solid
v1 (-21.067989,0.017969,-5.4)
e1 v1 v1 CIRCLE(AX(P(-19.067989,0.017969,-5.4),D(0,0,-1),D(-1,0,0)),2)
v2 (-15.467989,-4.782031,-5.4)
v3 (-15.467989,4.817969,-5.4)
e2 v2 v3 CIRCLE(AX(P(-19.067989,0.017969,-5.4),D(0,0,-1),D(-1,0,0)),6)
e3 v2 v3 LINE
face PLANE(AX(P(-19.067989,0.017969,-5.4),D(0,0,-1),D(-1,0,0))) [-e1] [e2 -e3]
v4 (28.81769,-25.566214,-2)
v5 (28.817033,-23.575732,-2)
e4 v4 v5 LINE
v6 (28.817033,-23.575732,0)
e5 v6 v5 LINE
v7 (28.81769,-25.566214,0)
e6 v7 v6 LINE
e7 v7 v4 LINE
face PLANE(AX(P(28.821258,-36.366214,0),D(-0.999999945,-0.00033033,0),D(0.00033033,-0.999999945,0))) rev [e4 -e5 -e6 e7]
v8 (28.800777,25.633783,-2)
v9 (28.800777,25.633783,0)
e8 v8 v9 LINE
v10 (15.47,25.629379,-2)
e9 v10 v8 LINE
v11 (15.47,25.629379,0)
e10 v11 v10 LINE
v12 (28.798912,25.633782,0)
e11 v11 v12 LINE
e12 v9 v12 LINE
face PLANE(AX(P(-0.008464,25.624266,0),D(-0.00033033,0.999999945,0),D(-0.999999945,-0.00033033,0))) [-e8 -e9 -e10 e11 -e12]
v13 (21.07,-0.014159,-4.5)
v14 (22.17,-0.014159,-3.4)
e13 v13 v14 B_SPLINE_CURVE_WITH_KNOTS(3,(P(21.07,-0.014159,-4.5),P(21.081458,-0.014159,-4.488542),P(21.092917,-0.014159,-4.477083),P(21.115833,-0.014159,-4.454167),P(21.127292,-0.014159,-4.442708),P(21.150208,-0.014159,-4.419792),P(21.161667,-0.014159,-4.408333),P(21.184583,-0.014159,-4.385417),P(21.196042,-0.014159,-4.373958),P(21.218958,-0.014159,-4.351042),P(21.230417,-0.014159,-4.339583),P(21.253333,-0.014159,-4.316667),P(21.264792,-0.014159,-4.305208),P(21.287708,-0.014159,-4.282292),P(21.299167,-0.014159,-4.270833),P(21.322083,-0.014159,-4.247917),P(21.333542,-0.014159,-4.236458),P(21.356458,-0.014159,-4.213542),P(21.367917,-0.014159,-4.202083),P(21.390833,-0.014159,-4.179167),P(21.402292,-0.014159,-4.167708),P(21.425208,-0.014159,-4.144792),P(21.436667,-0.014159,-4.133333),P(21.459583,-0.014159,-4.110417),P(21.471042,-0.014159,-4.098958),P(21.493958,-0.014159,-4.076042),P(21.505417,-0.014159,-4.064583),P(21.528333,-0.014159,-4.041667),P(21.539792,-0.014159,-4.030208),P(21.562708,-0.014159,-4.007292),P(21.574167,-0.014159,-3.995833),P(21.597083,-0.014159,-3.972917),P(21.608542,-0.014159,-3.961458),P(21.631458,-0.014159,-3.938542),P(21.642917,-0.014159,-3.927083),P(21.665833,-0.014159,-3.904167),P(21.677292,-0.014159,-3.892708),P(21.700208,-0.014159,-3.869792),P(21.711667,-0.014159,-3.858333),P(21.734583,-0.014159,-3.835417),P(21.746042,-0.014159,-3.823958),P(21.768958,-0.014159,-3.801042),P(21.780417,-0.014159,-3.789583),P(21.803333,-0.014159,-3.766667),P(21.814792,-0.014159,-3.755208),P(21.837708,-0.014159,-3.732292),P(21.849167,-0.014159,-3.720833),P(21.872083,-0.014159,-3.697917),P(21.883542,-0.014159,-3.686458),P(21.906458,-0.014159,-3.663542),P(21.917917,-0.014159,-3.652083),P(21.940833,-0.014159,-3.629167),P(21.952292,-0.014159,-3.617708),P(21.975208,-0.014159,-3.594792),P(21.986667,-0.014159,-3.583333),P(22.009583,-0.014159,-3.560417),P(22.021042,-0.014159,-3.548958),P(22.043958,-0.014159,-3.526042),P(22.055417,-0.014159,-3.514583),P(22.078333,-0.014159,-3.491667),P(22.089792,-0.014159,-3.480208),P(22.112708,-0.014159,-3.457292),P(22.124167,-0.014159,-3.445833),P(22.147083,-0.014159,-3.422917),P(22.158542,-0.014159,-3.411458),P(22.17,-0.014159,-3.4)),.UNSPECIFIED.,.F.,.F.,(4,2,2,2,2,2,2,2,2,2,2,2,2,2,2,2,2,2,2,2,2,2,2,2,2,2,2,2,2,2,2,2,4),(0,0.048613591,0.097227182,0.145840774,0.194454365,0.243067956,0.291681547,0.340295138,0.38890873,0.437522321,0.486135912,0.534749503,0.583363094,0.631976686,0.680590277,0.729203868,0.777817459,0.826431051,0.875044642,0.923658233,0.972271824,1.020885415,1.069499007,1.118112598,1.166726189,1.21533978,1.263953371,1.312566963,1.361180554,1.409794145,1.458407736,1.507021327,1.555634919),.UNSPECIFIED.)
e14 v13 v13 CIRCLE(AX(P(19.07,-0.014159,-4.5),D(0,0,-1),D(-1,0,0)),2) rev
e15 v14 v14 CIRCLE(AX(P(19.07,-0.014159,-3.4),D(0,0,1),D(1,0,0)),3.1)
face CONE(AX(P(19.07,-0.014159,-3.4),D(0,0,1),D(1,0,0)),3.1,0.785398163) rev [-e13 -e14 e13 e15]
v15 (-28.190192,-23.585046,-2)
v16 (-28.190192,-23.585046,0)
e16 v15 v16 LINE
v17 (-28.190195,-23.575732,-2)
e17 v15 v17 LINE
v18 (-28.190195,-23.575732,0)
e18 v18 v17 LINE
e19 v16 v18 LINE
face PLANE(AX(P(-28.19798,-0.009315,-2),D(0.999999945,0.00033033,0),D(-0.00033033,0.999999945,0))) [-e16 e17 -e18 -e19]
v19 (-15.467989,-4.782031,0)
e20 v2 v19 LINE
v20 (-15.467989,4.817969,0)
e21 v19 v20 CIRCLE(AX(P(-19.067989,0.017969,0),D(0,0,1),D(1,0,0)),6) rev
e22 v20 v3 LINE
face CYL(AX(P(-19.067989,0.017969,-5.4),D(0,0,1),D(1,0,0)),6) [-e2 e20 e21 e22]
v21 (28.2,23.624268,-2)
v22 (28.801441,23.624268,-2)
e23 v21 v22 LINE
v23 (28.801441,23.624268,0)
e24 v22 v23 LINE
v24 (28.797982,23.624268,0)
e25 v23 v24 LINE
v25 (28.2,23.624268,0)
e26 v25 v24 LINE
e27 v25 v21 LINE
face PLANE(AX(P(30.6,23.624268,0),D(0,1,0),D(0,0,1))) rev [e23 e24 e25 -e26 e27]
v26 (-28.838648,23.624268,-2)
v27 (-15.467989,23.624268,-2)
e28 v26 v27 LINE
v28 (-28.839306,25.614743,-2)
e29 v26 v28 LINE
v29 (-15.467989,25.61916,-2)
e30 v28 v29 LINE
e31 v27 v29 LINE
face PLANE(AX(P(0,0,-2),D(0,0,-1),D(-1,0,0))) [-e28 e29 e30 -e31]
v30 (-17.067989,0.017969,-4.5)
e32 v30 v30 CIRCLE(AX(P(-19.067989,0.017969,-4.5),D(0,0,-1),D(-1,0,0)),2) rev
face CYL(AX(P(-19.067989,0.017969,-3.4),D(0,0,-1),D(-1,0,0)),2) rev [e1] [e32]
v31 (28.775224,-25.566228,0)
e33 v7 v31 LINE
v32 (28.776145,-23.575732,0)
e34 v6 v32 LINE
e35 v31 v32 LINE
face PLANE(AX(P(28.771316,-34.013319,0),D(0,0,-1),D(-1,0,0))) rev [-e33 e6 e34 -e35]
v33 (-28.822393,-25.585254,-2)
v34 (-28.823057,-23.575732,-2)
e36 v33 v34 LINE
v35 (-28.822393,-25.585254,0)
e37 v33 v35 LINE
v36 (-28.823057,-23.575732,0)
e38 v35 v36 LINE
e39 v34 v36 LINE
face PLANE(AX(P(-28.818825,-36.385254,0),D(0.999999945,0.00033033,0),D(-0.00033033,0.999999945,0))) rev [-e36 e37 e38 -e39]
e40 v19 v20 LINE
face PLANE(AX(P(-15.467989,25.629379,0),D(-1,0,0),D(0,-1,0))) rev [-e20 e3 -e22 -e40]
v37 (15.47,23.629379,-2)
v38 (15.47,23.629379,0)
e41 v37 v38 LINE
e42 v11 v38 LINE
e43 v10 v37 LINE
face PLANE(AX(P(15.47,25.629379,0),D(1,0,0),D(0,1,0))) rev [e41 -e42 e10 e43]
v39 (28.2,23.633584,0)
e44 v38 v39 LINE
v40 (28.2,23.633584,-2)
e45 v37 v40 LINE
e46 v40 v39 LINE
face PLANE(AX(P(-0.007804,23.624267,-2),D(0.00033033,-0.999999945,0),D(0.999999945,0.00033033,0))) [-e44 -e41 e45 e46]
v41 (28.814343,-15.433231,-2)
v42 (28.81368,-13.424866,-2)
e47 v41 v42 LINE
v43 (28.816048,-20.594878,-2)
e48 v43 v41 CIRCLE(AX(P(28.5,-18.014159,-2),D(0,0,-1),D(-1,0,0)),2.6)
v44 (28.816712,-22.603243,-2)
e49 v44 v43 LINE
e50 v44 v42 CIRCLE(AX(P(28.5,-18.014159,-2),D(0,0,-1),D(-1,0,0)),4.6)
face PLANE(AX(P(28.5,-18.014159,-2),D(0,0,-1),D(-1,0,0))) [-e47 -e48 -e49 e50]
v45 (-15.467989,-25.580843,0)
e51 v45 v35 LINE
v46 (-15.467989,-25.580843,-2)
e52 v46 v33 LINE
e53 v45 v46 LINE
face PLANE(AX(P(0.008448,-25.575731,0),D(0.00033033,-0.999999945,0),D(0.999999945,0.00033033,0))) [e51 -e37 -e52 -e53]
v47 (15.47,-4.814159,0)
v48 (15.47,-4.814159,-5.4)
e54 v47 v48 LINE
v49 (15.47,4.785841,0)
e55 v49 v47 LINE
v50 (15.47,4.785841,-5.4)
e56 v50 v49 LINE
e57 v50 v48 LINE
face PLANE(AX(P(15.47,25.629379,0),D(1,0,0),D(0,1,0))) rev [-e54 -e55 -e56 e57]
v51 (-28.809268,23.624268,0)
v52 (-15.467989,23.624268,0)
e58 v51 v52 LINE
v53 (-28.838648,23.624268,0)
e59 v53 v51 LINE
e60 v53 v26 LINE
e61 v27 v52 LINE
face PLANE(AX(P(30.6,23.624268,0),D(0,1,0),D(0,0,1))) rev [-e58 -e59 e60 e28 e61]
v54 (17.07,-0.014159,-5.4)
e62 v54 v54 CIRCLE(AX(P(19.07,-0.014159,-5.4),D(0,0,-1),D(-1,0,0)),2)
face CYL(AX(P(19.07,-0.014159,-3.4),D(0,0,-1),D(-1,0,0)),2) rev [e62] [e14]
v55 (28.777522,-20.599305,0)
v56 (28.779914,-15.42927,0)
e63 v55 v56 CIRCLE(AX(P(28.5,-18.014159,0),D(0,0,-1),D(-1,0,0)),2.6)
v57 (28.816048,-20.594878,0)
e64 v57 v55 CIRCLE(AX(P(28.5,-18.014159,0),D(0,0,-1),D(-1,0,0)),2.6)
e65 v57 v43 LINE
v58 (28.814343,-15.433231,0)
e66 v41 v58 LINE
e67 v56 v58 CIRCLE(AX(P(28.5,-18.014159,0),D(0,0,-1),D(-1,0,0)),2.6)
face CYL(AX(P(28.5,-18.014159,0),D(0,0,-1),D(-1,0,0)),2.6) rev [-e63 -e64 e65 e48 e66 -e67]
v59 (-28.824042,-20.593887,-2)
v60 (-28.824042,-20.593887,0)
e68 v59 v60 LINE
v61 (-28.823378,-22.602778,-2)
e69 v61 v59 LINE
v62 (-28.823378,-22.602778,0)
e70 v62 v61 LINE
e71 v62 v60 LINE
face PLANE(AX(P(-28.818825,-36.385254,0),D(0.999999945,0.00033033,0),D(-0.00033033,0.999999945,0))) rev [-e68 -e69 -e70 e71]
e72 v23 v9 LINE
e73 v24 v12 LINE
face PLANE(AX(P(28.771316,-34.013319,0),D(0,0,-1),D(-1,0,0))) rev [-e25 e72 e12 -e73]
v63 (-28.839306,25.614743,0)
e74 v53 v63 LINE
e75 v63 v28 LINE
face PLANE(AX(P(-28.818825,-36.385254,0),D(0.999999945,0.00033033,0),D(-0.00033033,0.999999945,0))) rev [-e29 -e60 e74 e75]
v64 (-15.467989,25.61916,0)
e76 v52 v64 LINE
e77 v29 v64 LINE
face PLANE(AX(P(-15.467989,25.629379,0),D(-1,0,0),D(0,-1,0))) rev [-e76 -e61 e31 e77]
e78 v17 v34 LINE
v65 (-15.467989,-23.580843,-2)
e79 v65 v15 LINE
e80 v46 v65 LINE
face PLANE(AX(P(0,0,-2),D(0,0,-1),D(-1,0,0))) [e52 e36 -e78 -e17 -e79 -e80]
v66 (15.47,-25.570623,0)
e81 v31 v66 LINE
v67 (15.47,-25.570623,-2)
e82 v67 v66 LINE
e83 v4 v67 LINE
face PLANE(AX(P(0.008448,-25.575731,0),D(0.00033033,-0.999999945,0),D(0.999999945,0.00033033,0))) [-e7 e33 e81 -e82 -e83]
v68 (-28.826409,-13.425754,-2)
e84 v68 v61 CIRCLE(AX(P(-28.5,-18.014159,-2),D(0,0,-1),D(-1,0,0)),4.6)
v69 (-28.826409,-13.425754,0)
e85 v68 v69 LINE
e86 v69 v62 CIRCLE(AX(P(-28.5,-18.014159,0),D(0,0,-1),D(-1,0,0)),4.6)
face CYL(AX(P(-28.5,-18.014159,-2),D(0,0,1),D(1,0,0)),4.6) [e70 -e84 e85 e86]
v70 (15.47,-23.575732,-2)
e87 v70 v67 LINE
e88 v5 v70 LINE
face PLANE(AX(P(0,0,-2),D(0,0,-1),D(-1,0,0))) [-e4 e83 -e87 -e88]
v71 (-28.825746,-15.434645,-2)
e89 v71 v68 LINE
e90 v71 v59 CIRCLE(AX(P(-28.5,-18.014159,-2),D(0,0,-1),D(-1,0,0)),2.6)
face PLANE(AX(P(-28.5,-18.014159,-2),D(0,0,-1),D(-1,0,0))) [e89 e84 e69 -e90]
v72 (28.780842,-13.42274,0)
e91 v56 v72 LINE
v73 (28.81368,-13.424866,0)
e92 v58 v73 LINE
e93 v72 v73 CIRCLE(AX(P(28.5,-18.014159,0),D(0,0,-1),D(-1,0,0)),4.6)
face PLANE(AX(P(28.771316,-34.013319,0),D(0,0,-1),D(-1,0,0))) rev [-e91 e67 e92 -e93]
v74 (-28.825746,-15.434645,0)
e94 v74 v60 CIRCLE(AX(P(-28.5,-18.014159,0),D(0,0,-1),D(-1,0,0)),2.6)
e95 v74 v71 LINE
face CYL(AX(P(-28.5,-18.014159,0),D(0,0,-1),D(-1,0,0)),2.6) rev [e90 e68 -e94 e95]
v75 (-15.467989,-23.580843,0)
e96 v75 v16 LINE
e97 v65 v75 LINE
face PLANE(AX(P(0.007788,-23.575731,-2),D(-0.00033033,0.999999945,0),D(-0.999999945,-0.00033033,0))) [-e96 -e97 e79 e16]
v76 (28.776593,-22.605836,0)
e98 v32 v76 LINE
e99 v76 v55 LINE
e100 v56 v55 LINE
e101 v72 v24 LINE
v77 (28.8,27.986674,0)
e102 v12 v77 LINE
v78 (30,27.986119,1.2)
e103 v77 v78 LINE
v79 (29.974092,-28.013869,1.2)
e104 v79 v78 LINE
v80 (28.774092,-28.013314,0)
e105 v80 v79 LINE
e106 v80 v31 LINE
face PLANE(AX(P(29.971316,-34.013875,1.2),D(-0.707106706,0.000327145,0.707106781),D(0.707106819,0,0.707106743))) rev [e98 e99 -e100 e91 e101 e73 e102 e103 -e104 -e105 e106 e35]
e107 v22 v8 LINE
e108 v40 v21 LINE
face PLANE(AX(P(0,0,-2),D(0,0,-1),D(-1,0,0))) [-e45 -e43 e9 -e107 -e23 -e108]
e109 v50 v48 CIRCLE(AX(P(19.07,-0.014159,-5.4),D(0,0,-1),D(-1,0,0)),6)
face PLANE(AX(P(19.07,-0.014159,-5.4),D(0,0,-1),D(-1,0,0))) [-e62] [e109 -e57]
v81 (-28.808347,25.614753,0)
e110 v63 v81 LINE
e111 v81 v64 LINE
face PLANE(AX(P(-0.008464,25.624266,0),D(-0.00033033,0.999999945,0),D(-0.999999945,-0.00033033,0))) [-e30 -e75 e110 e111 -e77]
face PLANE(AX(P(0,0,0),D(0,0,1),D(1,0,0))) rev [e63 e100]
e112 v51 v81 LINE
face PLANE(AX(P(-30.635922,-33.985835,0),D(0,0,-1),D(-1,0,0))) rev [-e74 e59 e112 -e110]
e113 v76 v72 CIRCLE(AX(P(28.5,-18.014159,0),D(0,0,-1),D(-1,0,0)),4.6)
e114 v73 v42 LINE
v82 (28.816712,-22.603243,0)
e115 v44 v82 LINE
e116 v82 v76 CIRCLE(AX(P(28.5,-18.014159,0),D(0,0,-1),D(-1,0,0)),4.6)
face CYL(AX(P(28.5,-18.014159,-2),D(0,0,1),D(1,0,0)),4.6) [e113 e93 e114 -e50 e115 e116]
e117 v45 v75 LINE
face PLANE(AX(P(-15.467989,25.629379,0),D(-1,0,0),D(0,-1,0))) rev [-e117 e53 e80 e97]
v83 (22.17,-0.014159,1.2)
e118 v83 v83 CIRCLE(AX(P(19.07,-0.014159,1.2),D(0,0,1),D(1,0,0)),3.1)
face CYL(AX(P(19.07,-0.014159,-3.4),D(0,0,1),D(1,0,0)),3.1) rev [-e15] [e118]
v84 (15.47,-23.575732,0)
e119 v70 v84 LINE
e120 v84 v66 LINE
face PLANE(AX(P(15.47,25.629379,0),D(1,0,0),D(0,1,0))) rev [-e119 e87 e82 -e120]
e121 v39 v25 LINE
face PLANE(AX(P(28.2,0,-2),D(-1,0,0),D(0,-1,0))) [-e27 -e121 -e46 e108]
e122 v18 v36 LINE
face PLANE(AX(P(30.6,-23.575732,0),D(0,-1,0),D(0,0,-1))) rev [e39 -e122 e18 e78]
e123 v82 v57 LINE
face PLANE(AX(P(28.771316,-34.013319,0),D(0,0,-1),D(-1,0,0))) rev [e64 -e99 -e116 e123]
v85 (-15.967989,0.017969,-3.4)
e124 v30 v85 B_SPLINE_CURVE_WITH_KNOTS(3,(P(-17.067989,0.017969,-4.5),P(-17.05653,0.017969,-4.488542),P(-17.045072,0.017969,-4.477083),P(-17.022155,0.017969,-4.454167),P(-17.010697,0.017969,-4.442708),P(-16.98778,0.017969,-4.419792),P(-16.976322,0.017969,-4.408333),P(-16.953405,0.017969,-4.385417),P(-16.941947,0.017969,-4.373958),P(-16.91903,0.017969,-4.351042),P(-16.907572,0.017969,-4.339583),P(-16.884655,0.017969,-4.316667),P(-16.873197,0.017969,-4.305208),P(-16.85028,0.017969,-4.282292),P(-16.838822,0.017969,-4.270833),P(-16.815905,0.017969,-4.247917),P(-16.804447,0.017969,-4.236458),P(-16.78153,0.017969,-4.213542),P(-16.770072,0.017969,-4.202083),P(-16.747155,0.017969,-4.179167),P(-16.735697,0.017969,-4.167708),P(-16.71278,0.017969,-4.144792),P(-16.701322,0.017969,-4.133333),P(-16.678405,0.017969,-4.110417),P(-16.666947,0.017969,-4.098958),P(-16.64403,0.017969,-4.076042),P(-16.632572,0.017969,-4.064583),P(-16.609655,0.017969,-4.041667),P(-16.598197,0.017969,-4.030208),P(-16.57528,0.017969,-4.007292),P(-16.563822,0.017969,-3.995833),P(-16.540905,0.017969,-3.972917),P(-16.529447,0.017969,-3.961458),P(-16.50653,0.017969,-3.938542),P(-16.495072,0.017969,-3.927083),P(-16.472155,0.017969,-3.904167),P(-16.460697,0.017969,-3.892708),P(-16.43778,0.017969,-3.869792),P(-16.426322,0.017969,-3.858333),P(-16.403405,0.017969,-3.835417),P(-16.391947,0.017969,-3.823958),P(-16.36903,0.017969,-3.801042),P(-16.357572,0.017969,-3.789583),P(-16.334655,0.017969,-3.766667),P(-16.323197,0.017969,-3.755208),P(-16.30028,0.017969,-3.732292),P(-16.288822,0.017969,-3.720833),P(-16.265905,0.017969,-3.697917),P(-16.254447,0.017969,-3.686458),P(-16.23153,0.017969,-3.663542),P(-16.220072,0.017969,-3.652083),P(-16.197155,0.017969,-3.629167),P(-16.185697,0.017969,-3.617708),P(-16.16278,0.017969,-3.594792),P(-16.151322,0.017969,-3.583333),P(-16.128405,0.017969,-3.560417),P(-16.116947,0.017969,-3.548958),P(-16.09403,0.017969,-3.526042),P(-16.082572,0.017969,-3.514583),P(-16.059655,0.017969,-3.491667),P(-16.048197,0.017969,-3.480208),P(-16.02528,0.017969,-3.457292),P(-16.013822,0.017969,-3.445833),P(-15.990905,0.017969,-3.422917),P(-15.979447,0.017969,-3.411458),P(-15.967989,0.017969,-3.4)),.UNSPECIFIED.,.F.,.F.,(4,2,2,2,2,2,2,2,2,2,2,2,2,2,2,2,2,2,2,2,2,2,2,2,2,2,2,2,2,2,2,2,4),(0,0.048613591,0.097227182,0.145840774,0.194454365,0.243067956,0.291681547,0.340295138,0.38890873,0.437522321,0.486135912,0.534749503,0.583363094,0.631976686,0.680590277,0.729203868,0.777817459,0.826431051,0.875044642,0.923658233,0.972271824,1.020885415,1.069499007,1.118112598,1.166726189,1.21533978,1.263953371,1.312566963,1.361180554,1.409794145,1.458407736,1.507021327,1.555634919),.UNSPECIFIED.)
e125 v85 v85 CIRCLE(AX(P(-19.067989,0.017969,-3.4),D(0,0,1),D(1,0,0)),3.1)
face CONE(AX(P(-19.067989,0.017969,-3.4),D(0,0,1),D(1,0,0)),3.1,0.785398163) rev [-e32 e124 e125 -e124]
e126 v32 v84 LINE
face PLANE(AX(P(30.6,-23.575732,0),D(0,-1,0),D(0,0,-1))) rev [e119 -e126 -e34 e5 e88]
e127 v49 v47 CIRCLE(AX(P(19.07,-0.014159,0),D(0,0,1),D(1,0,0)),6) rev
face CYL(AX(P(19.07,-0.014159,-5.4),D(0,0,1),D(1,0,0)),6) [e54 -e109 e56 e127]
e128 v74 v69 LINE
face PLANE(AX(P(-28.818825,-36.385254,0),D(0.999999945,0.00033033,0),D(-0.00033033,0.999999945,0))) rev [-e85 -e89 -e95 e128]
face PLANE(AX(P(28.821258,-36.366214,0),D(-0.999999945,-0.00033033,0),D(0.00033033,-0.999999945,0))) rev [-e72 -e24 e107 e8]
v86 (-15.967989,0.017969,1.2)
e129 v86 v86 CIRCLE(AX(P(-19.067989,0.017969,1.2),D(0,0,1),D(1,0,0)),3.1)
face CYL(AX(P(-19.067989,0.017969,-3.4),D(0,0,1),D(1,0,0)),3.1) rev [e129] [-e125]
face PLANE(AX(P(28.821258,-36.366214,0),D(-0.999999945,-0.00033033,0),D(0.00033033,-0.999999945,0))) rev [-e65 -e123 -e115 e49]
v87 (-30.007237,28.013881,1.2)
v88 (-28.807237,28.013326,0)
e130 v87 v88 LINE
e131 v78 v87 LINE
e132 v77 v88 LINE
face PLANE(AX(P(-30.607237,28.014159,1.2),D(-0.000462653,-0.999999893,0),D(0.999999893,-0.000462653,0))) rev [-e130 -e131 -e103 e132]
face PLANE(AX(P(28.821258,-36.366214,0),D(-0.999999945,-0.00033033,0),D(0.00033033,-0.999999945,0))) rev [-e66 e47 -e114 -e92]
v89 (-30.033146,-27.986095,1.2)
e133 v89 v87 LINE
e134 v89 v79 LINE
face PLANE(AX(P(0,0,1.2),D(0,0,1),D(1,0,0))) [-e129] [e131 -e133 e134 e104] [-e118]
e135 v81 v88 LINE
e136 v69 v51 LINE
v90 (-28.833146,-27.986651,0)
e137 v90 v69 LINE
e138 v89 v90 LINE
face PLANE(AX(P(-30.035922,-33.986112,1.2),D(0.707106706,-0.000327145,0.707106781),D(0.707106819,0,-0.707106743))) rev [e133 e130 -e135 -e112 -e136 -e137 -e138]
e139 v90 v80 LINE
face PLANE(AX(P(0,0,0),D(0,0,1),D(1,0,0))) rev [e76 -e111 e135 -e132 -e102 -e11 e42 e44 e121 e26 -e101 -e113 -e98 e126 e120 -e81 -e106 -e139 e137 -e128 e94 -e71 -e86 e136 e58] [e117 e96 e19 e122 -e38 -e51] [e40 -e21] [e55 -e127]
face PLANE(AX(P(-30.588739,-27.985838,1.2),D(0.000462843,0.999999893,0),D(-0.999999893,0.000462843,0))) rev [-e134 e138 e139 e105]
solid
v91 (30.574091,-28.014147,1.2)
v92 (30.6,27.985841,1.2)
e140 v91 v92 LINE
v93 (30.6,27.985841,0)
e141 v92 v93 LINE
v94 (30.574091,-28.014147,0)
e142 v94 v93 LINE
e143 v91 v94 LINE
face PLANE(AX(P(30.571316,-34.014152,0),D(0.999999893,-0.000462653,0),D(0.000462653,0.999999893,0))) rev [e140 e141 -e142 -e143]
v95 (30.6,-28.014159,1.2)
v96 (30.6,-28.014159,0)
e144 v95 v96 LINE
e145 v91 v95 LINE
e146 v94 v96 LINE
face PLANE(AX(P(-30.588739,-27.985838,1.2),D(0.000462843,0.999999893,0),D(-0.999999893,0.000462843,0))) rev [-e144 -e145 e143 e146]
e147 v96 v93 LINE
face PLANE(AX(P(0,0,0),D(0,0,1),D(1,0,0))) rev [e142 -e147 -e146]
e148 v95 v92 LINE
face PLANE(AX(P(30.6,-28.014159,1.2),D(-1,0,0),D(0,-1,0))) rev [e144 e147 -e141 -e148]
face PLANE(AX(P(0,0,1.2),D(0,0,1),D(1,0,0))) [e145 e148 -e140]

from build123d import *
from build123d.topology import SkipClean

# Parameters (mm, degrees)
SKETCH_3_R          = 2.6
EXTRUDE_1_DEPTH     = 1.2
EXTRUDE_1_2_DEPTH   = 2
CUT_EXTRUDE_2_DEPTH = 2
SKETCH_7_W          = 61.190195572
SKETCH_7_H          = 47.2
CUT_EXTRUDE_1_DEPTH = 2
EXTRUDE_START       = 5.4
SKETCH_8_R          = 6
SKETCH_8_R_2        = 2.6
EXTRUDE_2_DEPTH     = 5.4
SKETCH_9_R          = 3
SKETCH_9_R_2        = 2
EXTRUDE_2_2_DEPTH   = 2
SKETCH_10_R         = 4.6
SKETCH_10_R_2       = 2
EXTRUDE_3_DEPTH     = 2
CUT_EXTRUDE_START   = -2
SKETCH_11_R         = 2.6
SKETCH_11_R_2       = 2
CUT_EXTRUDE_3_DEPTH = 2
CUT_EXTRUDE_4_DEPTH = 62
SKETCH_13_W         = 4.275106326
SKETCH_13_H         = 2
SKETCH_13_W_2       = 4.284804349
CUT_EXTRUDE_5_DEPTH = 62
SKETCH_14_W         = 30.93798866
SKETCH_14_H         = 51.210222553
CUT_EXTRUDE_6_DEPTH = 5.4
SKETCH_17_R         = 3.1
CUT_EXTRUDE_8_DEPTH = 4.6
CHAMFER_1_SIZE      = 1.1


with BuildPart() as part:
    # Эскиз3 → Extrude 1 (new body)
    with BuildSketch(Plane.XY):
        Polygon((30.6, -28.01415885), (30.6, 27.98584115), (-30.607237283, 28.01415885), (-30.588738779, -27.985838095), align=None)
        with Locations((-19.06798866, 0.017969087)):
            Circle(SKETCH_3_R, mode=Mode.SUBTRACT)
        with Locations((19.07, -0.01415885)):
            Circle(SKETCH_3_R, mode=Mode.SUBTRACT)
    extrude(amount=EXTRUDE_1_DEPTH)

    # Эскиз5 → Extrude 1 2 (add)
    with BuildSketch(Plane(origin=(0, 0, 0), x_dir=(-1, 0, 0), z_dir=(0, 0, -1))):
        Polygon((-30.6, 26.034377354), (30.606576622, 26.014158959), (30.58939944, -25.985838204), (-30.6, -25.965625483), align=None)
        Polygon((-28.2, 23.63358443), (28.20578396, 23.614951883), (28.190192364, -23.585045542), (-28.2, -23.566418145), align=None, mode=Mode.SUBTRACT)
    extrude(amount=EXTRUDE_1_2_DEPTH)

    # Эскиз6 → Вырез-Вытянуть-Тонкостенный2 (cut)
    with BuildSketch(Plane(origin=(0, 0, -2), x_dir=(-1, 0, 0), z_dir=(0, 0, -1))):
        Polygon((-30.6, 26.034377354), (-30.6, -25.965625483), (30.58939944, -25.985838204), (30.606576622, 26.014158959), align=None)
        Polygon((-30.2, 25.6342452), (-30.2, -25.565757593), (30.189531594, -25.585706094), (30.206444512, 25.614291113), align=None, mode=Mode.SUBTRACT)
    extrude(amount=-CUT_EXTRUDE_2_DEPTH, mode=Mode.SUBTRACT)

    # Эскиз7 → Вырез-Вытянуть1 (cut)
    with BuildSketch(Plane(origin=(0, 0, -2), x_dir=(-1, 0, 0), z_dir=(0, 0, -1))):
        with Locations((-0.004902214, 0.024268156)):
            Rectangle(SKETCH_7_W, SKETCH_7_H)
    extrude(amount=-CUT_EXTRUDE_1_DEPTH, mode=Mode.SUBTRACT)

    # Эскиз8 → Extrude 2 (add)
    # profile 1 of 2: a face of its own
    with SkipClean():  # the faces are left unmerged after this step: merging them gives an invalid solid
        with BuildSketch(Plane(origin=(0, 0, 0), x_dir=(-1, 0, 0), z_dir=(0, 0, -1)).offset(EXTRUDE_START)):
            with Locations(Location((-19.07, -0.01415885, 0), (0, 0, 180))):
                Circle(SKETCH_8_R)
            with Locations((-19.07, -0.01415885)):
                Circle(SKETCH_8_R_2, mode=Mode.SUBTRACT)
        # profile 2 of 2: a face of its own
        with BuildSketch(Plane(origin=(0, 0, 0), x_dir=(-1, 0, 0), z_dir=(0, 0, -1)).offset(EXTRUDE_START)):
            with Locations(Location((19.06798866, 0.017969087, 0), (0, 0, 180))):
                Circle(SKETCH_8_R)
            with Locations((19.06798866, 0.017969087)):
                Circle(SKETCH_8_R_2, mode=Mode.SUBTRACT)
        extrude(amount=-EXTRUDE_2_DEPTH)

    # Эскиз9 → Extrude 2 2 (add)
    # profile 1 of 2: a face of its own
    with SkipClean():  # the faces are left unmerged after this step: merging them gives an invalid solid
        with BuildSketch(Plane(origin=(0, 0, -5.4), x_dir=(-1, 0, 0), z_dir=(0, 0, -1))):
            with Locations((-19.07, -0.01415885)):
                Circle(SKETCH_9_R)
            with Locations((-19.07, -0.01415885)):
                Circle(SKETCH_9_R_2, mode=Mode.SUBTRACT)
        # profile 2 of 2: a face of its own
        with BuildSketch(Plane(origin=(0, 0, -5.4), x_dir=(-1, 0, 0), z_dir=(0, 0, -1))):
            with Locations((19.06798866, 0.017969087)):
                Circle(SKETCH_9_R)
            with Locations((19.06798866, 0.017969087)):
                Circle(SKETCH_9_R_2, mode=Mode.SUBTRACT)
        extrude(amount=-EXTRUDE_2_2_DEPTH)

    # Эскиз10 → Вытянуть-Тонкостенный3 (add)
    # profile 1 of 2: a face of its own
    with SkipClean():  # the faces are left unmerged after this step: merging them gives an invalid solid
        with BuildSketch(Plane(origin=(0, 0, 0), x_dir=(-1, 0, 0), z_dir=(0, 0, -1))):
            with Locations((28.5, -18.01415885)):
                Circle(SKETCH_10_R)
            with Locations((28.5, -18.01415885)):
                Circle(SKETCH_10_R_2, mode=Mode.SUBTRACT)
        # profile 2 of 2: a face of its own
        with BuildSketch(Plane(origin=(0, 0, 0), x_dir=(-1, 0, 0), z_dir=(0, 0, -1))):
            with Locations((-28.5, -18.01415885)):
                Circle(SKETCH_10_R)
            with Locations((-28.5, -18.01415885)):
                Circle(SKETCH_10_R_2, mode=Mode.SUBTRACT)
        extrude(amount=EXTRUDE_3_DEPTH)

    # Эскиз11 → Вырез-Вытянуть-Тонкостенный3 (cut)
    # profile 1 of 2: a face of its own
    with SkipClean():  # the faces are left unmerged after this step: merging them gives an invalid solid
        with BuildSketch(Plane(origin=(0, 0, -2), x_dir=(-1, 0, 0), z_dir=(0, 0, -1)).offset(CUT_EXTRUDE_START)):
            with Locations((28.5, -18.01415885)):
                Circle(SKETCH_11_R)
            with Locations((28.5, -18.01415885)):
                Circle(SKETCH_11_R_2, mode=Mode.SUBTRACT)
        # profile 2 of 2: a face of its own
        with BuildSketch(Plane(origin=(0, 0, -2), x_dir=(-1, 0, 0), z_dir=(0, 0, -1)).offset(CUT_EXTRUDE_START)):
            with Locations((-28.5, -18.01415885)):
                Circle(SKETCH_11_R)
            with Locations((-28.5, -18.01415885)):
                Circle(SKETCH_11_R_2, mode=Mode.SUBTRACT)
        extrude(amount=CUT_EXTRUDE_3_DEPTH, mode=Mode.SUBTRACT)

    # Эскиз12 → Вырез-Вытянуть4 (cut)
    with SkipClean():  # the faces are left unmerged after this step: merging them gives an invalid solid
        with BuildSketch(Plane(origin=(0.012954275, 27.999992332, 0), x_dir=(0.9999998929762139, -0.0004626527434190302, 0), z_dir=(0.0004626527434190302, 0.9999998929762139, 0))):
            Polygon((29.987048999, -1.2), (28.787048999, 0), (30.587048999, 0), (30.587048999, -1.2), align=None)
            Polygon((-30.020194835, -1.2), (-28.820194835, 0), (-30.620194835, 0), (-30.620194835, -1.2), align=None)
        extrude(amount=-CUT_EXTRUDE_4_DEPTH, mode=Mode.SUBTRACT)

    # Эскиз13 → Вырез-Вытянуть5 (cut)
    with SkipClean():  # the faces are left unmerged after this step: merging them gives an invalid solid
        with BuildSketch(Plane(origin=(-0.008464475, 25.624266425, 0), x_dir=(0.9999999454409052, 0.00033033042028954735, 0), z_dir=(-0.00033033042028954735, 0.9999999454409053, 0))):
            with Locations((-30.968395907, 1)):
                Rectangle(SKETCH_13_W, SKETCH_13_H)
            with Locations((30.951645646, 1)):
                Rectangle(SKETCH_13_W_2, SKETCH_13_H)
        extrude(amount=-CUT_EXTRUDE_5_DEPTH, mode=Mode.SUBTRACT)


with BuildPart() as cut_extrude_5_piece_1:
    # of the separate pieces the step leaves, piece 1, a body of its own (cut_extrude_5_pieces)
    add(part.part.solids().sort_by_distance((23.9, -18.01415885, 0))[0])

    # Эскиз14 → Вырез-Вытянуть6 (cut)
    with SkipClean():  # the faces are left unmerged after this step: merging them gives an invalid solid
        with BuildSketch(Plane(origin=(0, 0, -5.4), x_dir=(-1, 0, 0), z_dir=(0, 0, -1))):
            with Locations((-0.00100567, 0.024268156)):
                Rectangle(SKETCH_14_W, SKETCH_14_H)
        extrude(amount=-CUT_EXTRUDE_6_DEPTH, mode=Mode.SUBTRACT)

    # Эскиз17 → Вырез-Вытянуть8 (cut)
    with BuildSketch(Plane.XY.offset(1.2)):
        with Locations((-19.06798866, 0.017969087)):
            Circle(SKETCH_17_R)
        with Locations((19.07, -0.01415885)):
            Circle(SKETCH_17_R)
    extrude(amount=-CUT_EXTRUDE_8_DEPTH, mode=Mode.SUBTRACT)

    # Фаска1
    chamfer_1_edges = [cut_extrude_5_piece_1.edges().sort_by_distance(p)[0] for p in [
        (21.07, -0.01415885, -3.4),
        (-17.06798866, 0.017969087, -3.4),
    ]]
    chamfer(chamfer_1_edges, length=CHAMFER_1_SIZE - 0.0001)  # a hair under: the kernel refuses the full size


with BuildPart() as cut_extrude_5_piece_2:
    # of the separate pieces the step leaves, piece 2, a body of its own (cut_extrude_5_pieces)
    add(part.part.solids().sort_by_distance((30.6, -28.01415885, 0))[0])


solid = Compound([cut_extrude_5_piece_1.part, cut_extrude_5_piece_2.part])
